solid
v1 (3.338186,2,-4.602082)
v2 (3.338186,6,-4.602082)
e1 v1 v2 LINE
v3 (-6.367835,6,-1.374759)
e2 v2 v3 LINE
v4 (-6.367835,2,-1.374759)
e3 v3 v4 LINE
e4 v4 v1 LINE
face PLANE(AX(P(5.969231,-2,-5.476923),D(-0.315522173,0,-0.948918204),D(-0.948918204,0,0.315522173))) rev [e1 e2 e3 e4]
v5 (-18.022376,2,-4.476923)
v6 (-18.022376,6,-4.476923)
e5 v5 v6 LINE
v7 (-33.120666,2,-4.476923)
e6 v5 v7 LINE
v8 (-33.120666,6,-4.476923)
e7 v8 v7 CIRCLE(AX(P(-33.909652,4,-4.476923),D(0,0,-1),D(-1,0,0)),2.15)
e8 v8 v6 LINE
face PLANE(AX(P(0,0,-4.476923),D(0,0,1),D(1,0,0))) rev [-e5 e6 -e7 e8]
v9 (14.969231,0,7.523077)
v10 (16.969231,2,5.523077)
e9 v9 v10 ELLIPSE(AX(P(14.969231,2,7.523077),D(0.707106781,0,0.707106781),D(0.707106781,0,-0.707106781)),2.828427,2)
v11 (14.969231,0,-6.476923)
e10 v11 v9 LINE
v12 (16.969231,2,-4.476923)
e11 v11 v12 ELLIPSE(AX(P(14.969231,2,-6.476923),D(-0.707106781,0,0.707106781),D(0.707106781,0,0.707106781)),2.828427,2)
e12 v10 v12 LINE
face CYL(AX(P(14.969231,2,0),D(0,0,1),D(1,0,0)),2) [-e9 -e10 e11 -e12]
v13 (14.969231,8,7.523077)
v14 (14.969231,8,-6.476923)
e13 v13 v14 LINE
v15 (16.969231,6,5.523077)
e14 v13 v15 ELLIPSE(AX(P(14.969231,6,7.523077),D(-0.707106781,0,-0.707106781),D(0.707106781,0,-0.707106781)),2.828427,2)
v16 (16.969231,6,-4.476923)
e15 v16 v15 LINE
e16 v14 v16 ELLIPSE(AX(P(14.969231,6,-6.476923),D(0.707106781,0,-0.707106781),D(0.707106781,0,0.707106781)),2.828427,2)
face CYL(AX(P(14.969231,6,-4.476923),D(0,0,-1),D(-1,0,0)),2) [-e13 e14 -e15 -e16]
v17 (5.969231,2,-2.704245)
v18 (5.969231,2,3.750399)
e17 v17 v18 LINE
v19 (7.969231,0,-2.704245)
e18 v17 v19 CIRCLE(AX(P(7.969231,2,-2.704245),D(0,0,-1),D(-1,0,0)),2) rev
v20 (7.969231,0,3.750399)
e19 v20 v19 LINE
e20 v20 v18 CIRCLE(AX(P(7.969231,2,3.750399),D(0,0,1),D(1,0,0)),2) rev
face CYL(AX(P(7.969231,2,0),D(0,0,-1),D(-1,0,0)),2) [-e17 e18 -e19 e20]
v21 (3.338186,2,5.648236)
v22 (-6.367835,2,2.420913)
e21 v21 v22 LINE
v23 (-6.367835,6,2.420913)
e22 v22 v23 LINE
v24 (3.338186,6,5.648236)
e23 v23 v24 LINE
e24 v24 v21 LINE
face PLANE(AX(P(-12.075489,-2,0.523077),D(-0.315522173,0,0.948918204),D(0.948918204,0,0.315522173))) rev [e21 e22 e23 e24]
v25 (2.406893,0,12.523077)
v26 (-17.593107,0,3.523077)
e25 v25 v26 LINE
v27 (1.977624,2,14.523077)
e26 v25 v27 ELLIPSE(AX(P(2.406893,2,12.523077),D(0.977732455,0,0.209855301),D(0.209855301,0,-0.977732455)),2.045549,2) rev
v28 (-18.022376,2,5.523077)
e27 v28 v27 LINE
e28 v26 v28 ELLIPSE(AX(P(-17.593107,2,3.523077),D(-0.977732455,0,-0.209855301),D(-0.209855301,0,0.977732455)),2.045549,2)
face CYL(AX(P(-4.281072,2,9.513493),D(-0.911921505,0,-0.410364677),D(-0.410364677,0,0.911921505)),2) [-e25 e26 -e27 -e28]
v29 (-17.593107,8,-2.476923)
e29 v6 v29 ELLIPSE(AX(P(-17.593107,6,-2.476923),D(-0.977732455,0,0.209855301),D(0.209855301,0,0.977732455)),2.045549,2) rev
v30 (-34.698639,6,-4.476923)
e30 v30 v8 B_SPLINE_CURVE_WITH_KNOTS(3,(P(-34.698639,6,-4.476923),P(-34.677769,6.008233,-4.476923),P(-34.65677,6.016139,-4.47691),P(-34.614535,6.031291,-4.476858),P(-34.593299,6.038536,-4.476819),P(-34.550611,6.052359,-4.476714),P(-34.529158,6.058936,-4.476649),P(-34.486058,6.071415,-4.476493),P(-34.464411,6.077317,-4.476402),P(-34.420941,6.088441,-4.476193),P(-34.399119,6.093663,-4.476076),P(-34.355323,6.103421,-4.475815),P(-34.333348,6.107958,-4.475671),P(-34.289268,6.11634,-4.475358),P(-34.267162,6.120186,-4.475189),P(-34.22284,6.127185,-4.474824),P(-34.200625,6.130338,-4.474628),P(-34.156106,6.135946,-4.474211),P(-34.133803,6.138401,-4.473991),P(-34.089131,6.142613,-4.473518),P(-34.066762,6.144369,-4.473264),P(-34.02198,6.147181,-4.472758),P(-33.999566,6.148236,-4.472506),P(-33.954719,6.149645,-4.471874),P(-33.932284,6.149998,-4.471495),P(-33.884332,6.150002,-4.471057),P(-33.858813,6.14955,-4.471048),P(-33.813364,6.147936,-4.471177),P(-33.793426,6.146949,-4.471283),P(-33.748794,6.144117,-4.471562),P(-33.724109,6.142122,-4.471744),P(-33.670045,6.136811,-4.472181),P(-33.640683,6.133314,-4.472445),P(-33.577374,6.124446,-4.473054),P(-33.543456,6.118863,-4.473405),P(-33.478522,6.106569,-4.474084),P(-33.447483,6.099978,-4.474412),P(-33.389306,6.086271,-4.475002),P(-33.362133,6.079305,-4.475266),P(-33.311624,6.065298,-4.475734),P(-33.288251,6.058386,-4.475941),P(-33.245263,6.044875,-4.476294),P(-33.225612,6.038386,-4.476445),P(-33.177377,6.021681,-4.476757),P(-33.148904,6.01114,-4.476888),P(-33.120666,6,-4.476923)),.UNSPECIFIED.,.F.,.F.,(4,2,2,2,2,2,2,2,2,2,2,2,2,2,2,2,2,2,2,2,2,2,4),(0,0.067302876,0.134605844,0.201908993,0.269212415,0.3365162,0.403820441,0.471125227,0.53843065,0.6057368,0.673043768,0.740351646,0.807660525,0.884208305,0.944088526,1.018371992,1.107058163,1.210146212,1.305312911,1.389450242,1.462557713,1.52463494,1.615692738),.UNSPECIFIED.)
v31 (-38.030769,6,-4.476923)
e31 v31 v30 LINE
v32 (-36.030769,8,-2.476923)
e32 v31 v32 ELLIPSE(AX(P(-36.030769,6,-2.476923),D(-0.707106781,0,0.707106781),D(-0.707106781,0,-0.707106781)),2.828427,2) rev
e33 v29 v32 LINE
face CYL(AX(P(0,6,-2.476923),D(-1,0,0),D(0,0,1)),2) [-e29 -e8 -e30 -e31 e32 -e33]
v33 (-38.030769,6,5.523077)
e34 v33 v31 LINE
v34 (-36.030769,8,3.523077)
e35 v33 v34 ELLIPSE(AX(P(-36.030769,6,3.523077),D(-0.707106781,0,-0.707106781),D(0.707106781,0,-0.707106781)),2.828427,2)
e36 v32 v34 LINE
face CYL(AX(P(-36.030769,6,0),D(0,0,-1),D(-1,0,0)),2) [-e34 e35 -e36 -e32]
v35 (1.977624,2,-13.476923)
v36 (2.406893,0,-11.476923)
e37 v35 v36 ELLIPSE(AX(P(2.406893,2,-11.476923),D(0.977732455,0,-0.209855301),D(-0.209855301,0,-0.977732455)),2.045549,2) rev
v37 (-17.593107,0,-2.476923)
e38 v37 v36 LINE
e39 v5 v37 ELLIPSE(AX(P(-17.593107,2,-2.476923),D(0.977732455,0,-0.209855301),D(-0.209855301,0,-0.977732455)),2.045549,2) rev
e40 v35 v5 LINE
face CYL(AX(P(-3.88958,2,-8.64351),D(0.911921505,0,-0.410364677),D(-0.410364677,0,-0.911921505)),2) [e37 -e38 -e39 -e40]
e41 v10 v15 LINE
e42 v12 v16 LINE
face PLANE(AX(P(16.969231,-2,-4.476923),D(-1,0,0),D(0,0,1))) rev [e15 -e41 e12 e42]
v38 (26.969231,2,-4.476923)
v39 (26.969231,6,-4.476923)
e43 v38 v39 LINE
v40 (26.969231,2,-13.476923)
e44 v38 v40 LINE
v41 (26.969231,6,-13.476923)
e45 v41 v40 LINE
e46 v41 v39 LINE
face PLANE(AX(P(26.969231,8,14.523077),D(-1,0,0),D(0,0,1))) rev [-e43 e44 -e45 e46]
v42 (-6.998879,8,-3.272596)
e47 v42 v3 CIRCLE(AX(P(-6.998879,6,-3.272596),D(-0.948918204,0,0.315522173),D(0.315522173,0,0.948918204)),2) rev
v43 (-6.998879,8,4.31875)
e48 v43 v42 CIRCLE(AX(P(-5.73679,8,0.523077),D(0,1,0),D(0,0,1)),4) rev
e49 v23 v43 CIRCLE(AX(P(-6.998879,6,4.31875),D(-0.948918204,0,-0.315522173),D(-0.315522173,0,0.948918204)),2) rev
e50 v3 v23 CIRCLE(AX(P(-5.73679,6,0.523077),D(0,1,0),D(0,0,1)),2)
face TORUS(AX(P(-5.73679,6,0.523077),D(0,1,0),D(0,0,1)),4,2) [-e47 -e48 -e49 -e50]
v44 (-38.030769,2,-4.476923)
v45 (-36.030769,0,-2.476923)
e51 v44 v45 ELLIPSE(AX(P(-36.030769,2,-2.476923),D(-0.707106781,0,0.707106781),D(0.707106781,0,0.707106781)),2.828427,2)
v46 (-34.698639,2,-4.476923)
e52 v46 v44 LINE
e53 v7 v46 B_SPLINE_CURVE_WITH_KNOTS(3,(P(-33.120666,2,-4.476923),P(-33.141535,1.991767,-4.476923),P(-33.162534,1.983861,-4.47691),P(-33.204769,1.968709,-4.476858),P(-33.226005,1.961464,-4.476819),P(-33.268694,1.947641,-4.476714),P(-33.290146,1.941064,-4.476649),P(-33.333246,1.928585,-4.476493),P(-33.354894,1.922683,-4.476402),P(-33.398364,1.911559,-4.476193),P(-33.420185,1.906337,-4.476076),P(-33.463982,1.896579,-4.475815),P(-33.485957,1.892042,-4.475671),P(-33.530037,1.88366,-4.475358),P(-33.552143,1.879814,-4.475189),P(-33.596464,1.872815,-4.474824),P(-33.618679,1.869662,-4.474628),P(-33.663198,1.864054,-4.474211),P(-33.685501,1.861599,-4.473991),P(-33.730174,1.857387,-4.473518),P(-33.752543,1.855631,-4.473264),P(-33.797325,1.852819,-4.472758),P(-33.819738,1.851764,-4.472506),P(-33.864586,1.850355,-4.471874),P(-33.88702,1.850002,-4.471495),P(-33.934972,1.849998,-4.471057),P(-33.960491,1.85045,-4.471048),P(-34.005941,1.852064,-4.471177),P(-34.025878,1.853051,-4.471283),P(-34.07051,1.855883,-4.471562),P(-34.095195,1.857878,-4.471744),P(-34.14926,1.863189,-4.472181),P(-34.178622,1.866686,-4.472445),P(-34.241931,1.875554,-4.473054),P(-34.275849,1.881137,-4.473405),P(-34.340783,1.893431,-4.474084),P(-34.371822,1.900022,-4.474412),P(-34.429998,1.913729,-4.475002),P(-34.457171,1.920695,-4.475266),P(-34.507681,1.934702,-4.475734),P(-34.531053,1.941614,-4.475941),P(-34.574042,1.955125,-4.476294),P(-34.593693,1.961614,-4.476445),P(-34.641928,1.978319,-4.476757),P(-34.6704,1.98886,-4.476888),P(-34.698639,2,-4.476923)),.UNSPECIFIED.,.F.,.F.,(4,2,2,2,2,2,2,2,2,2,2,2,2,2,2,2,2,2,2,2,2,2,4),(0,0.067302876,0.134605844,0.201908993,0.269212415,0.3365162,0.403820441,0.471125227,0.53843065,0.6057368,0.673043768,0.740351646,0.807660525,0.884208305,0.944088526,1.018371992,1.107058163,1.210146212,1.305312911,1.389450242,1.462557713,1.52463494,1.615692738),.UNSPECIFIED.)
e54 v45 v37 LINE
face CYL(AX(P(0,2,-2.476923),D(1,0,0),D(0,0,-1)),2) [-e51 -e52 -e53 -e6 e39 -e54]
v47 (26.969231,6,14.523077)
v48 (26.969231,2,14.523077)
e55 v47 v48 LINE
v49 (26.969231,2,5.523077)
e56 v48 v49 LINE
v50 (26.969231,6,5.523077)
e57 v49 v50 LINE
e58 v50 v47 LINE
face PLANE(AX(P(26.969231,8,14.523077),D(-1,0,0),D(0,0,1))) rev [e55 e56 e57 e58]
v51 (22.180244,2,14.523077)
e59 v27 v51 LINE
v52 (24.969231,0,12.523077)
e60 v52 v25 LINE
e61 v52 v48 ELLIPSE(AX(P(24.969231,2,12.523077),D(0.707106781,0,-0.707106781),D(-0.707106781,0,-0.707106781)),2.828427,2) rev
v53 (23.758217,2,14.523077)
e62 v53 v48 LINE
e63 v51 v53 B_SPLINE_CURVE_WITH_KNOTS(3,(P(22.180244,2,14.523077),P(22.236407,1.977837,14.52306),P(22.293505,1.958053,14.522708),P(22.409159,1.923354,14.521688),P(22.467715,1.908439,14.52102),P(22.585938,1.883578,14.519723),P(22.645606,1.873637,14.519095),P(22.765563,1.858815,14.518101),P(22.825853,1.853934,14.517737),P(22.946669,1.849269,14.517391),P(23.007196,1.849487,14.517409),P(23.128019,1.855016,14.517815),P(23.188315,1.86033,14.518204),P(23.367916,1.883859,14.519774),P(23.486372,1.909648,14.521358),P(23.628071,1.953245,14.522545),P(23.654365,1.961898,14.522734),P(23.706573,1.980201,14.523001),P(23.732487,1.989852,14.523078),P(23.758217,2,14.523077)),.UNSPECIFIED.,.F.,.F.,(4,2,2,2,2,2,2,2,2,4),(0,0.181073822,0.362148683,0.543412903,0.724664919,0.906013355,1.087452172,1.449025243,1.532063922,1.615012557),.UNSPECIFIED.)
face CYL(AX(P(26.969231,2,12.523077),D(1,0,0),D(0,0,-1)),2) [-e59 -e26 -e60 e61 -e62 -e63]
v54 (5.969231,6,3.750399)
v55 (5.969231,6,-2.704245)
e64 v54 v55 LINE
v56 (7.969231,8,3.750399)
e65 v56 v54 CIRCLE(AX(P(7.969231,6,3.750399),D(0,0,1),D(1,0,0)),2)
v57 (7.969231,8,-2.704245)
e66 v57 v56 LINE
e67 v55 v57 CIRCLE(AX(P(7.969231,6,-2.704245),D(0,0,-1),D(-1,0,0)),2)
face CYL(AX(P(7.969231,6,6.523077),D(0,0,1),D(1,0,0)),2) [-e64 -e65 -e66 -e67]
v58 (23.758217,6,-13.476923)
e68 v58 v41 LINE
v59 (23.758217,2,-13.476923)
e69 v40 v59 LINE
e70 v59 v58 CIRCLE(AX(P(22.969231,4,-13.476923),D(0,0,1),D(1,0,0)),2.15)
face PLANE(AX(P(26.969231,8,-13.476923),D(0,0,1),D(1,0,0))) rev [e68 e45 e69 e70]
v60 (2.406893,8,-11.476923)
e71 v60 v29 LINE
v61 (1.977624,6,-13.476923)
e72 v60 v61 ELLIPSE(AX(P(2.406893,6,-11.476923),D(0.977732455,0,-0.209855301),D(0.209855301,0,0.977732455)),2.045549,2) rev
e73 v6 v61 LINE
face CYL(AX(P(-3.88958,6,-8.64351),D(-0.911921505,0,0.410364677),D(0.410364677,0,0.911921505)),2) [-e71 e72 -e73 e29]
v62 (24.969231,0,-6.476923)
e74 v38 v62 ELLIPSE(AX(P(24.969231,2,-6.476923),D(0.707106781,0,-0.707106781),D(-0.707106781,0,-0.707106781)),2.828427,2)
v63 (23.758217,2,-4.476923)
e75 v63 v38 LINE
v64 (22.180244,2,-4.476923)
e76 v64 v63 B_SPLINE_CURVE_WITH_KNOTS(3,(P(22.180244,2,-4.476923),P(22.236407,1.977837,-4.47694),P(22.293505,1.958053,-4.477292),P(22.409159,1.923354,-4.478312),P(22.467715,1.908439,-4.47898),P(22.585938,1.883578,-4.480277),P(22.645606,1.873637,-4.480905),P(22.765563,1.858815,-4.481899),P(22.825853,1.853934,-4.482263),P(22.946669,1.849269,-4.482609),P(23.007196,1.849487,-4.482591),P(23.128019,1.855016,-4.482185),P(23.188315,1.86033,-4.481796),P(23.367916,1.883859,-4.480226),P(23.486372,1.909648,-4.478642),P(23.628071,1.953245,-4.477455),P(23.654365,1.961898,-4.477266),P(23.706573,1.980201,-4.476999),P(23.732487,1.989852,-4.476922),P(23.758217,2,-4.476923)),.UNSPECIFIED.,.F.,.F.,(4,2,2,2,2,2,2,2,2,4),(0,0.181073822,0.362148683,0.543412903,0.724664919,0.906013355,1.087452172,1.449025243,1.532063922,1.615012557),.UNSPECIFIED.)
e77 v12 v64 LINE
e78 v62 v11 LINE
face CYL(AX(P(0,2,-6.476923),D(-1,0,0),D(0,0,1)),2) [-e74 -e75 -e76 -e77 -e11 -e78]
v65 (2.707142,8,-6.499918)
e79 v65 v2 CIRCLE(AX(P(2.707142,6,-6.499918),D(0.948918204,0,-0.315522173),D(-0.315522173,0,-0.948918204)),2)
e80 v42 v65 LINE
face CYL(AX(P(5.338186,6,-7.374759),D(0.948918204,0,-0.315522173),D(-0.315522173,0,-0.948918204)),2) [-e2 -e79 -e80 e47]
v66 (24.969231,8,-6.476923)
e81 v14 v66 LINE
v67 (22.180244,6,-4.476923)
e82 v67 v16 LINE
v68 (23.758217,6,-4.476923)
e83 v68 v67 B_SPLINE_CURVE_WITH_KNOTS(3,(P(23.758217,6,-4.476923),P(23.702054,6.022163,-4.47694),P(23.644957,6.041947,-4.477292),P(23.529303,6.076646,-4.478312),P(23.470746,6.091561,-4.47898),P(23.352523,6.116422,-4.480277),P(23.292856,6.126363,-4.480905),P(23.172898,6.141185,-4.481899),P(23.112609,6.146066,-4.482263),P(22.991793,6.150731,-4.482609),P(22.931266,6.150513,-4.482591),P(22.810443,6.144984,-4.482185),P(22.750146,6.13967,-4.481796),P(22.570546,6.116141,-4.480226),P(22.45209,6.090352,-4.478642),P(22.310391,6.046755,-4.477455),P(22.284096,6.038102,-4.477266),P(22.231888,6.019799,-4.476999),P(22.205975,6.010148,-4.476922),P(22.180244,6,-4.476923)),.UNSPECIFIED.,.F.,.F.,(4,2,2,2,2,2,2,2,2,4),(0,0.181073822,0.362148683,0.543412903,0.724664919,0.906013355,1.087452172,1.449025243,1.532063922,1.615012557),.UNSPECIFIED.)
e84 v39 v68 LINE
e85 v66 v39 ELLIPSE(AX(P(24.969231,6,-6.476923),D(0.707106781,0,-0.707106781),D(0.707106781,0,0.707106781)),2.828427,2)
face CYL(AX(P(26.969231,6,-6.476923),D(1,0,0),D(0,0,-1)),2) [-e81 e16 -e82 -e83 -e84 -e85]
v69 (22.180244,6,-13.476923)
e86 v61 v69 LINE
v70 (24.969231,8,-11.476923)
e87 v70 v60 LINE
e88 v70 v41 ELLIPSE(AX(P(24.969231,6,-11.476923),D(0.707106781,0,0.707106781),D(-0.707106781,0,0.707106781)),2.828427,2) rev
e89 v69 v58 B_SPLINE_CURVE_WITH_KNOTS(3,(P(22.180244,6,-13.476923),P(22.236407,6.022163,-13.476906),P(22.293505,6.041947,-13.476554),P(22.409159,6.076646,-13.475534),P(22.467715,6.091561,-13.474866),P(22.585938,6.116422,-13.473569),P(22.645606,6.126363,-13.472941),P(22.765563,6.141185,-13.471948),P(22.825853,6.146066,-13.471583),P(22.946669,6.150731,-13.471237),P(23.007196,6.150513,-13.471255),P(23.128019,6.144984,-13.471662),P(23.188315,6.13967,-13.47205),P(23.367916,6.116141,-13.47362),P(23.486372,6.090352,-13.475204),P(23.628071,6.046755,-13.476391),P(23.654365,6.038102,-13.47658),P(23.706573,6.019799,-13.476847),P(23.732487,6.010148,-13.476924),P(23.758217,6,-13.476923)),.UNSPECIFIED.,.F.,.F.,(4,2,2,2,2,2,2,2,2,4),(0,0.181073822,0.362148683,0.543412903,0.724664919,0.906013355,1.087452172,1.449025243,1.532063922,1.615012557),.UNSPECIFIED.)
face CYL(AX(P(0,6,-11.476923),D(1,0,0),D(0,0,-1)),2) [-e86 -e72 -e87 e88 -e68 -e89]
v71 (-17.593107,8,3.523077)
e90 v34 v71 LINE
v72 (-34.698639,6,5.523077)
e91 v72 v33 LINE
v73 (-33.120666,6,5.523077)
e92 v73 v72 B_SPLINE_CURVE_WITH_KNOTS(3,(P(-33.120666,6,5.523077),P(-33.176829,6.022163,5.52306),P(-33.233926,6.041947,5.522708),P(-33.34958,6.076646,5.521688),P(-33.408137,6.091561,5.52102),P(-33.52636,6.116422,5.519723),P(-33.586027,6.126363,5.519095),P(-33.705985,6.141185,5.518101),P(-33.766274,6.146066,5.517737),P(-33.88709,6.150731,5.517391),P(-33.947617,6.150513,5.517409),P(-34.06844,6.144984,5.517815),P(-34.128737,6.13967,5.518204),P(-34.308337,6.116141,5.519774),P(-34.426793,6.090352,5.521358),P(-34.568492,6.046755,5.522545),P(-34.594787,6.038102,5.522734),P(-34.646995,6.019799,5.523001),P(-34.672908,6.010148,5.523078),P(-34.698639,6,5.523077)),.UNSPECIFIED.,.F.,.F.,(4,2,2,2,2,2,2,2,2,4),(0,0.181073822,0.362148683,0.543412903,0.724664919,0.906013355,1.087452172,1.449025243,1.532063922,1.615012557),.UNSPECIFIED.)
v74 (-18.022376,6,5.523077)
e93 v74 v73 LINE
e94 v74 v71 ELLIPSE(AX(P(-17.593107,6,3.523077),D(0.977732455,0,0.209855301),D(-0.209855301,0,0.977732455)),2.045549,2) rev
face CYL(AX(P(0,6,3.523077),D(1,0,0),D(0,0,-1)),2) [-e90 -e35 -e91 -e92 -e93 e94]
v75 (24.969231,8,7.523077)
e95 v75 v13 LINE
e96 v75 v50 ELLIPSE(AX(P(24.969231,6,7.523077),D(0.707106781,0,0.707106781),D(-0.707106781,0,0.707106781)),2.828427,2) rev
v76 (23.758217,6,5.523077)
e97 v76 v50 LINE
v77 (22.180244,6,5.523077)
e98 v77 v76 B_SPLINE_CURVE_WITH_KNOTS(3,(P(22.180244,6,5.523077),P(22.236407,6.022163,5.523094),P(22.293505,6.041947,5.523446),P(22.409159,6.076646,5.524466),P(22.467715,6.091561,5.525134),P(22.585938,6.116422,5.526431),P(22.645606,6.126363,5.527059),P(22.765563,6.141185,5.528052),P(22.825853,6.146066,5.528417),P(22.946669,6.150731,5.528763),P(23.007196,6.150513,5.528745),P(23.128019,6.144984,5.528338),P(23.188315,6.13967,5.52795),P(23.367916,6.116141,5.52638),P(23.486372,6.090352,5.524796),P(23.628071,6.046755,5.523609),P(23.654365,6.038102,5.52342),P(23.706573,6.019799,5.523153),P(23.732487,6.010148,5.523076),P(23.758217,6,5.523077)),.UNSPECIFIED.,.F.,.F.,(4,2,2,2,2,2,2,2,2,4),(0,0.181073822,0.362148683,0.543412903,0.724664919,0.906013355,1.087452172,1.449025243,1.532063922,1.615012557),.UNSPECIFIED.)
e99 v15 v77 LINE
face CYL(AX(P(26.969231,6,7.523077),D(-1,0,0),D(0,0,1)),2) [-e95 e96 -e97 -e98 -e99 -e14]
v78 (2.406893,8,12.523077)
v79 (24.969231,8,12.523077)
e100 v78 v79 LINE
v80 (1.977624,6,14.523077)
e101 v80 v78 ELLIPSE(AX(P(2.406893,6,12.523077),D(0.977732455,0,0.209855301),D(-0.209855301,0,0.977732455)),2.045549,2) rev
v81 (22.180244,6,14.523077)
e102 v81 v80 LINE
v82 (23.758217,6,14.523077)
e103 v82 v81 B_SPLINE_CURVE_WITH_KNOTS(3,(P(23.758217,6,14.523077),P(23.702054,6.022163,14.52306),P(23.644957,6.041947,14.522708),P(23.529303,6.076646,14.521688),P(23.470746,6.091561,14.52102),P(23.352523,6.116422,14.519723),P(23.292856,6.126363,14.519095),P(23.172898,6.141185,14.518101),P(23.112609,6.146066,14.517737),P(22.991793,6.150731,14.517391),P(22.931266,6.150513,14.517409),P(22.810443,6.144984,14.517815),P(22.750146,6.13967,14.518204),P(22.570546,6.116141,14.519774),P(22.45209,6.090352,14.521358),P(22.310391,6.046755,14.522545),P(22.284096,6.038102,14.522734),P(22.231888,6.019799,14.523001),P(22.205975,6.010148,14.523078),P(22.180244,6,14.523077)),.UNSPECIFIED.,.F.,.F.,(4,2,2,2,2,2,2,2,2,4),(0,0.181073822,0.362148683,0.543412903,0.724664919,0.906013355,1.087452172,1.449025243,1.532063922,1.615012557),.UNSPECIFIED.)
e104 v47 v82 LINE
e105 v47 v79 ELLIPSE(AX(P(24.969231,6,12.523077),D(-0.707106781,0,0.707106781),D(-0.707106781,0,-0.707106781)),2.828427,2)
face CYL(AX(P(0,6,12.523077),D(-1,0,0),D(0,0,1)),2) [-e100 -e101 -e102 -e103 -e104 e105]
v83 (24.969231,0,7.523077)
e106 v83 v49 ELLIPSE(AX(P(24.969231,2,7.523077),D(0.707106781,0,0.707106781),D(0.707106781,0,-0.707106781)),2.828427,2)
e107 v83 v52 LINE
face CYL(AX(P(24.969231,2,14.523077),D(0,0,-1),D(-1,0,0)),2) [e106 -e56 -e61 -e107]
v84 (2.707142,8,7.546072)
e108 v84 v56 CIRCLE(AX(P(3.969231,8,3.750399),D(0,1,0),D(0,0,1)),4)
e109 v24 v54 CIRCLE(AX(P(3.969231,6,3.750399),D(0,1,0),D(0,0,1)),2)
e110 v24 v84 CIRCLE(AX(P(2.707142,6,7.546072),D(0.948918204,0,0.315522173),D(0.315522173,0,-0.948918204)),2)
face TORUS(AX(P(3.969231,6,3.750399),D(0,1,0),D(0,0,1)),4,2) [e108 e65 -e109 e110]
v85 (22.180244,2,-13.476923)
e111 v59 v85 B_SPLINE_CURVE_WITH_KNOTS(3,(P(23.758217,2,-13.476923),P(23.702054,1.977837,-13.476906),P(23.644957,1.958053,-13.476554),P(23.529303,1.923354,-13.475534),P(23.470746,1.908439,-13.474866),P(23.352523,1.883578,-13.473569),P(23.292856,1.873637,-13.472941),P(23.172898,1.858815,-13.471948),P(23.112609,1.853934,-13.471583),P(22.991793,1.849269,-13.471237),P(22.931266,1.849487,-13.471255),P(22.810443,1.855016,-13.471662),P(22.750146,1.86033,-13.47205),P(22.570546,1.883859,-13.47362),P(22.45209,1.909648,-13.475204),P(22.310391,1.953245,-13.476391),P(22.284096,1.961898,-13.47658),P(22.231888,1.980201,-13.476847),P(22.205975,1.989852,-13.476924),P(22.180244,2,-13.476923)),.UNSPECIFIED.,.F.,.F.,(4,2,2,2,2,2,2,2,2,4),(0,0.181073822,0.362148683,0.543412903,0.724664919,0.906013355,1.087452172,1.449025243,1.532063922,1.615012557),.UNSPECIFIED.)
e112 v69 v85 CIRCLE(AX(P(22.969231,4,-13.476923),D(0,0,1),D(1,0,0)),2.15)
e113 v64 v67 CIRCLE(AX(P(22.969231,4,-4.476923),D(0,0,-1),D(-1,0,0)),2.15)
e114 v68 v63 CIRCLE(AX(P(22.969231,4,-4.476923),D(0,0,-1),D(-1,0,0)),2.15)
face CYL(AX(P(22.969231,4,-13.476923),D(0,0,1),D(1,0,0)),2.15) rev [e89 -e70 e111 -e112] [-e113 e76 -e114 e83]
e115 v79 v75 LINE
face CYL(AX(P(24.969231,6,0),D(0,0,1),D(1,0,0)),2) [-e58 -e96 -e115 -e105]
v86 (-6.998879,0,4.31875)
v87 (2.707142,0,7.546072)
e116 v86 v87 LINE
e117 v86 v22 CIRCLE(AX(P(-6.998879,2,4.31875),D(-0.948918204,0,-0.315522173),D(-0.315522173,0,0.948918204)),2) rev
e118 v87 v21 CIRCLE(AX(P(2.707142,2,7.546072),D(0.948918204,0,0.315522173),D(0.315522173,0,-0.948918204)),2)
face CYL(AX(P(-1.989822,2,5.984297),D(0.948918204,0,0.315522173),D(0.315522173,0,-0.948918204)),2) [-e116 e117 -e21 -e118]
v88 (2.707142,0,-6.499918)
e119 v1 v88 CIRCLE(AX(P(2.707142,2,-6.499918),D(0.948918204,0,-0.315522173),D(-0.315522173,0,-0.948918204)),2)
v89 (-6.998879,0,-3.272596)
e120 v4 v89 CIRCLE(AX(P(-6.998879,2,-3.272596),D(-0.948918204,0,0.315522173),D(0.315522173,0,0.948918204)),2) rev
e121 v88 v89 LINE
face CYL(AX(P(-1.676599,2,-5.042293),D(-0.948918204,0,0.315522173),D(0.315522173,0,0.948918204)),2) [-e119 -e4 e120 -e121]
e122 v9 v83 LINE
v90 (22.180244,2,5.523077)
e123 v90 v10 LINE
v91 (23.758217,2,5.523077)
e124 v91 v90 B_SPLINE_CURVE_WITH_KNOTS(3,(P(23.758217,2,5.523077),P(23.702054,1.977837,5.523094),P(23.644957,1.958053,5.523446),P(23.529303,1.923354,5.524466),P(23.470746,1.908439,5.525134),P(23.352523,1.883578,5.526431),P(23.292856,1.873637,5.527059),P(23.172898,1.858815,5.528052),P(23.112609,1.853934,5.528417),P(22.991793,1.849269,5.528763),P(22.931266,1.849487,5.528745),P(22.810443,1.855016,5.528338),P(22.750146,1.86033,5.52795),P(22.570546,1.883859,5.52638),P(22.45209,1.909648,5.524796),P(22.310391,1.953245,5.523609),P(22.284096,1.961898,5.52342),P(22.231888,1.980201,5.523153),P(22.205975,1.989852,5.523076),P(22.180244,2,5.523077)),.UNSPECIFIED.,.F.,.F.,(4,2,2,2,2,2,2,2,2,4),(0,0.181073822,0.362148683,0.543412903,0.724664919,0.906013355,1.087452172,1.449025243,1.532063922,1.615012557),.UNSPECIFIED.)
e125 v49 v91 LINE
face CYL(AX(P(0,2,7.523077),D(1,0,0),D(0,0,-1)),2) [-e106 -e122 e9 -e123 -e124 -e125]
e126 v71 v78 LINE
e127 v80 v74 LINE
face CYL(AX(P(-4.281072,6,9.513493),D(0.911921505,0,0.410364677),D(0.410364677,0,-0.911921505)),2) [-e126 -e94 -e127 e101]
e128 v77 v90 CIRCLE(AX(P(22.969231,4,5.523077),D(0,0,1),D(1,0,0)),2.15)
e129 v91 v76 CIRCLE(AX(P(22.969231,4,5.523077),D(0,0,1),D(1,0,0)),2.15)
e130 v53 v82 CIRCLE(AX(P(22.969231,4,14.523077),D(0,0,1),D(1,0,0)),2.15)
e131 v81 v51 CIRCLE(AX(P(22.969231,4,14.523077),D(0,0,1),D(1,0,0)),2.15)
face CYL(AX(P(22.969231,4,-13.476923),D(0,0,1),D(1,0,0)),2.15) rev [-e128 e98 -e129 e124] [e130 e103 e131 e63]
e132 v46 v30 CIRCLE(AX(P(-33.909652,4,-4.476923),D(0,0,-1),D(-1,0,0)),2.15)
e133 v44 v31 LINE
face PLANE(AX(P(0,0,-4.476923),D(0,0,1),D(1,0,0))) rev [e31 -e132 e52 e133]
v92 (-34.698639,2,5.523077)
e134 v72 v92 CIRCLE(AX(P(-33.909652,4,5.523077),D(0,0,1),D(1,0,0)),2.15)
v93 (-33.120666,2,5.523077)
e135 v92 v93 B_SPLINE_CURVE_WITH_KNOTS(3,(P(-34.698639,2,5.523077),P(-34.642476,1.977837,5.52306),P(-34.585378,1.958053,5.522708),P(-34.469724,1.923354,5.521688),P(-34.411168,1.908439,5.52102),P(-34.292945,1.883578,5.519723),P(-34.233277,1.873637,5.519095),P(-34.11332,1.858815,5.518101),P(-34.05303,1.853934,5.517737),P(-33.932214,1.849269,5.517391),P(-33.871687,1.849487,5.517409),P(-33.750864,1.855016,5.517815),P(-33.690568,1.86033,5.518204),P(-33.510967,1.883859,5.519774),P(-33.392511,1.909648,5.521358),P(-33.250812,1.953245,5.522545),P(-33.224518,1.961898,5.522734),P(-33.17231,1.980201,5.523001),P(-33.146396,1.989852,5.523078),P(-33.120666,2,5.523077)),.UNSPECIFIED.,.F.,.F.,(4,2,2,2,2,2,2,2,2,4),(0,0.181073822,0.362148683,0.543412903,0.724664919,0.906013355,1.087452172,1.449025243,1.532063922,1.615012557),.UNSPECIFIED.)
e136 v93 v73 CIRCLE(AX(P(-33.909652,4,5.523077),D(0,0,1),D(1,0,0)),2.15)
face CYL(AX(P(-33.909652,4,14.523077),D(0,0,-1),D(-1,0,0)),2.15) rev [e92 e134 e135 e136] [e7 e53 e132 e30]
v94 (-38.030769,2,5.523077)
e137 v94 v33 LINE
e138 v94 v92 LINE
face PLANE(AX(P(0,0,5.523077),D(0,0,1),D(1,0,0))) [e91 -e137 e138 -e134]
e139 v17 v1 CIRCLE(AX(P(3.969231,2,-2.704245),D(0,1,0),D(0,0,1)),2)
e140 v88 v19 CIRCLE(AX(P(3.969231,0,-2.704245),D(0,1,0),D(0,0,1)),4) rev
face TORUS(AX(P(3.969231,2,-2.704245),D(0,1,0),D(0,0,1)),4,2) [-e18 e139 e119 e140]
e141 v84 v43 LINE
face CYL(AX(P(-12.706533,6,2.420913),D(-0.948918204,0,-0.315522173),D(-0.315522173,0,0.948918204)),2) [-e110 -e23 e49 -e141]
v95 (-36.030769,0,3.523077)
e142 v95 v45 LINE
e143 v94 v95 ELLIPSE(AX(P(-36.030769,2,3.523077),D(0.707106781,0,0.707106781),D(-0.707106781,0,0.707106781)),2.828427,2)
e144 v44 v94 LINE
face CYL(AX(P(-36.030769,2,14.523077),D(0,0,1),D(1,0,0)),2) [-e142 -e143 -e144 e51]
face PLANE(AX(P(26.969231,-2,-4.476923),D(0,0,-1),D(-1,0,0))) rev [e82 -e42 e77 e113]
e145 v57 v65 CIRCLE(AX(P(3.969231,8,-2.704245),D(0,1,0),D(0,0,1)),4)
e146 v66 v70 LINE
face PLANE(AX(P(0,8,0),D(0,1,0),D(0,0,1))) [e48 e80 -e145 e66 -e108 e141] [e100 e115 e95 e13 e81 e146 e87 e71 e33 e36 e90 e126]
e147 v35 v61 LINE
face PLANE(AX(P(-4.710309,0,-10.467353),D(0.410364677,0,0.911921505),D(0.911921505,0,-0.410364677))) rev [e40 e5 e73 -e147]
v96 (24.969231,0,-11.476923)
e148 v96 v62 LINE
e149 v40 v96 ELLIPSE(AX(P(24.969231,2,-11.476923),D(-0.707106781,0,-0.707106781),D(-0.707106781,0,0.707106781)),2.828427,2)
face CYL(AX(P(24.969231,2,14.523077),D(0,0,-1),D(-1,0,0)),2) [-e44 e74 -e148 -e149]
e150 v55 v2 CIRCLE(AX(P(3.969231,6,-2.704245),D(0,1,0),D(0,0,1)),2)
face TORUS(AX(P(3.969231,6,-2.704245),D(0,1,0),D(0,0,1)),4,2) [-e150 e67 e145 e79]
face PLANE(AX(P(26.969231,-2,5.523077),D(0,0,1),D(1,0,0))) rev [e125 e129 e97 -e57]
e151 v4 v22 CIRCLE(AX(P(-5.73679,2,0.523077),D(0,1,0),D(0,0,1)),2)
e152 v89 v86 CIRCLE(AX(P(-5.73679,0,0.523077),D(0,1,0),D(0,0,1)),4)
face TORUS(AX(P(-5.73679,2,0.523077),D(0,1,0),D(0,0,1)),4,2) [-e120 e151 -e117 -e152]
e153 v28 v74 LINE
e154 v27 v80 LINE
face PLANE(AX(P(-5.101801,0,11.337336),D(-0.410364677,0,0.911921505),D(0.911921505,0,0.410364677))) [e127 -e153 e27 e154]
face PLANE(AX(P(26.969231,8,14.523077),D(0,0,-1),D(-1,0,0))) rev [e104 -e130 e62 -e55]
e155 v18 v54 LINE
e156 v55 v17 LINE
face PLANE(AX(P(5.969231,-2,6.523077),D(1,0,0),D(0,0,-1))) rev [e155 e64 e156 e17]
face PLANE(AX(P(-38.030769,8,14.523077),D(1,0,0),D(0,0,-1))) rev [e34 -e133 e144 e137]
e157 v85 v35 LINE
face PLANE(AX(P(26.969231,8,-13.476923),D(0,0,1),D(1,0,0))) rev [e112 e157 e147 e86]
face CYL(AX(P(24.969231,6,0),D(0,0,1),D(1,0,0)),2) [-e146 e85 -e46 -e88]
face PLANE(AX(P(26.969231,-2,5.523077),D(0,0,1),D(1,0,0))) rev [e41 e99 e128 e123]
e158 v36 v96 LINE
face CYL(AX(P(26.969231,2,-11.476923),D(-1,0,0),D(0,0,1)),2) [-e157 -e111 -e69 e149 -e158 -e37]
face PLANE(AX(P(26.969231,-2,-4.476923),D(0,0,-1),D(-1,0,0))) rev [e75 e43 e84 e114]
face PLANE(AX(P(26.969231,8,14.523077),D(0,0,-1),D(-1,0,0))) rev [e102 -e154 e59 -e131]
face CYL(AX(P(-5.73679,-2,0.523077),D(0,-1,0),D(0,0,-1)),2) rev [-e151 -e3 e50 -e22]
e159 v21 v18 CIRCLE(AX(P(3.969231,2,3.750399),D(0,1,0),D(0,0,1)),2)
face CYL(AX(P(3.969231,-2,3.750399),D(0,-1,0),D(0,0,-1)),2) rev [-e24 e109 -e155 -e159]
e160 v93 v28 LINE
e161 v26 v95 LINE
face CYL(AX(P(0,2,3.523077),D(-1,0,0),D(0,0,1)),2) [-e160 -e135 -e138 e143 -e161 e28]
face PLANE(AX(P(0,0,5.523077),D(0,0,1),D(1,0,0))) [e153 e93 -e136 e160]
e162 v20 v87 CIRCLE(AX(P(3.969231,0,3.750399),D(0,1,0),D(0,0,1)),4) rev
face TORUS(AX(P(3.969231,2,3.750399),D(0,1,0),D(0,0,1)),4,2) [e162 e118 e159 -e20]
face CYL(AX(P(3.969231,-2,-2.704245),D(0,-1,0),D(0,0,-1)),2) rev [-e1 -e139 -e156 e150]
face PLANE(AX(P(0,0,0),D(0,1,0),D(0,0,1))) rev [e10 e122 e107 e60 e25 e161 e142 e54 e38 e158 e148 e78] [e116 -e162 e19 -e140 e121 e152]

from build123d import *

# Parameters (mm, degrees)
SKETCH1_W           = 65
SKETCH1_H           = 28
BOSS_EXTRUDE1_DEPTH = 8
SKETCH2_W           = 10
SKETCH2_H           = 10
CUT_EXTRUDE1_DEPTH  = 10
SKETCH3_R           = 2.15
CUT_EXTRUDE2_DEPTH  = 48.899263129
SKETCH5_W           = 20.008392886
SKETCH5_H           = 9
CUT_EXTRUDE4_DEPTH  = 42.488060591
FILLET1_R           = 2
SKETCH8_R           = 2.15
CUT_EXTRUDE5_DEPTH  = 44.258980729
CUT_EXTRUDE6_DEPTH  = 10
FILLET2_R           = 2


with BuildPart() as part:
    # Sketch1 → Boss-Extrude1 (new body)
    with BuildSketch(Plane(origin=(0, 0, 0), x_dir=(1, 0, 0), z_dir=(0, 1, 0))):
        with Locations((-5.530769231, -0.523076923)):
            Rectangle(SKETCH1_W, SKETCH1_H)
    extrude(amount=BOSS_EXTRUDE1_DEPTH)

    # Sketch2 → Cut-Extrude1 (cut)
    with BuildSketch(Plane(origin=(0, 8, 0), x_dir=(1, 0, 0), z_dir=(0, 1, 0))):
        with Locations((21.969230769, -0.523076923)):
            Rectangle(SKETCH2_W, SKETCH2_H)
    extrude(amount=-CUT_EXTRUDE1_DEPTH, mode=Mode.SUBTRACT)

    # Sketch3 → Cut-Extrude2 (cut, through all)
    with BuildSketch(Plane.XY.offset(14.523076923)):
        with Locations((22.969230769, 4)):
            Circle(SKETCH3_R)
    extrude(amount=-CUT_EXTRUDE2_DEPTH, mode=Mode.SUBTRACT)

    # Sketch5 → Cut-Extrude4 (cut, through all)
    with BuildSketch(Plane(origin=(0, 8, 0), x_dir=(1, 0, 0), z_dir=(0, 1, 0))):
        with Locations((-28.026572788, 8.976923077)):
            Rectangle(SKETCH5_W, SKETCH5_H)
        Polygon((-18.022376345, 13.476923077), (-18.022376345, 4.476923077), (1.977623655, 13.476923077), align=None)
        Polygon((1.977623655, -14.523076923), (-18.022376345, -5.523076923), (-18.022376345, -14.523076923), align=None)
        with Locations((-28.026572788, -10.023076923)):
            Rectangle(SKETCH5_W, SKETCH5_H)
    extrude(amount=-CUT_EXTRUDE4_DEPTH, mode=Mode.SUBTRACT)

    # Fillet1
    # the kernel refuses this fillet: 2 mm, written as the material it takes off along each edge
    with BuildSketch(Plane(origin=(26.969230769, 0, -18.476923077), x_dir=(-1, 0, 0), z_dir=(0, 0, 1)), Plane(origin=(26.969230769, 0, 0.523076923), x_dir=(-1, 0, 0), z_dir=(0, 0, 1))) as fillet1_piece_1:
        with BuildLine():
            CenterArc((FILLET1_R, -FILLET1_R), FILLET1_R, 90, 90)
            Line((0, -FILLET1_R), (0, 0))
            Line((0, 0), (FILLET1_R, 0))
        make_face()
    extrude(amount=19, mode=Mode.SUBTRACT)
    with BuildSketch(Plane(origin=(16.969230769, 0, -4.476923077), x_dir=(0, 0, -1), z_dir=(1, 0, 0)), Plane(origin=(31.969230769, 0, 5.523076923), x_dir=(0, 0, 1), z_dir=(-1, 0, 0)), Plane(origin=(31.969230769, 8, -4.476923077), x_dir=(0, 0, -1), z_dir=(-1, 0, 0)), Plane(origin=(16.969230769, 8, 5.523076923), x_dir=(0, 0, 1), z_dir=(1, 0, 0))) as fillet1_piece_2:
        with BuildLine():
            CenterArc((FILLET1_R, FILLET1_R), FILLET1_R, 180, 90)
            Line((0, FILLET1_R), (0, 0))
            Line((0, 0), (FILLET1_R, 0))
        make_face()
    extrude(amount=15, mode=Mode.SUBTRACT)
    with BuildSketch(Plane(origin=(16.969230769, 0, 5.523076923), x_dir=(-1, 0, 0), z_dir=(0, 0, -1)), Plane(origin=(16.969230769, 8, -4.476923077), x_dir=(-1, 0, 0), z_dir=(0, 0, 1))) as fillet1_piece_3:
        with BuildLine():
            CenterArc((FILLET1_R, FILLET1_R), FILLET1_R, 180, 90)
            Line((0, FILLET1_R), (0, 0))
            Line((0, 0), (FILLET1_R, 0))
        make_face()
    extrude(amount=10, mode=Mode.SUBTRACT)
    with BuildSketch(Plane(origin=(26.969230769, 8, -18.476923077), x_dir=(-1, 0, 0), z_dir=(0, 0, 1)), Plane(origin=(26.969230769, 8, 0.523076923), x_dir=(-1, 0, 0), z_dir=(0, 0, 1))) as fillet1_piece_4:
        with BuildLine():
            CenterArc((FILLET1_R, FILLET1_R), FILLET1_R, 180, 90)
            Line((0, FILLET1_R), (0, 0))
            Line((0, 0), (FILLET1_R, 0))
        make_face()
    extrude(amount=19, mode=Mode.SUBTRACT)
    with BuildSketch(Plane(origin=(31.969230769, 0, 14.523076923), x_dir=(0, 1, 0), z_dir=(-1, 0, 0)), Plane(origin=(-3.022376345, 8, -13.476923077), x_dir=(0, 0, 1), z_dir=(1, 0, 0))) as fillet1_piece_5:
        with BuildLine():
            CenterArc((FILLET1_R, FILLET1_R), FILLET1_R, 180, 90)
            Line((0, FILLET1_R), (0, 0))
            Line((0, 0), (FILLET1_R, 0))
        make_face()
    extrude(amount=34.991607114, mode=Mode.SUBTRACT)
    with BuildSketch(Plane(origin=(-38.030769231, 0, 10.523076923), x_dir=(1, 0, 0), z_dir=(0, 0, -1))) as fillet1_piece_6:
        with BuildLine():
            CenterArc((FILLET1_R, -FILLET1_R), FILLET1_R, 90, 90)
            Line((0, -FILLET1_R), (0, 0))
            Line((0, 0), (FILLET1_R, 0))
        make_face()
    extrude(amount=20, mode=Mode.SUBTRACT)
    with BuildSketch(Plane(origin=(-38.030769231, 8, 10.523076923), x_dir=(1, 0, 0), z_dir=(0, 0, -1))) as fillet1_piece_7:
        with BuildLine():
            CenterArc((FILLET1_R, FILLET1_R), FILLET1_R, 180, 90)
            Line((0, FILLET1_R), (0, 0))
            Line((0, 0), (FILLET1_R, 0))
        make_face()
    extrude(amount=20, mode=Mode.SUBTRACT)
    with BuildSketch(Plane(origin=(31.969230769, 8, 14.523076923), x_dir=(0, -1, 0), z_dir=(-1, 0, 0)), Plane(origin=(-3.022376345, 0, -13.476923077), x_dir=(0, 0, 1), z_dir=(1, 0, 0))) as fillet1_piece_8:
        with BuildLine():
            CenterArc((FILLET1_R, -FILLET1_R), FILLET1_R, 90, 90)
            Line((0, -FILLET1_R), (0, 0))
            Line((0, 0), (FILLET1_R, 0))
        make_face()
    extrude(amount=34.991607114, mode=Mode.SUBTRACT)
    with BuildSketch(Plane(origin=(-13.022376345, 0, -4.476923077), x_dir=(0, 0, 1), z_dir=(-1, 0, 0))) as fillet1_piece_9_section:
        with BuildLine():
            CenterArc((FILLET1_R, FILLET1_R), FILLET1_R, 180, 90)
            Line((0, FILLET1_R), (0, 0))
            Line((0, 0), (FILLET1_R, 0))
        make_face()
    fillet1_piece_9 = extrude(amount=30.008392886, mode=Mode.PRIVATE)
    fillet1_piece_9 = split(fillet1_piece_9, bisect_by=Plane(origin=(-28.986353443, 0.462958452, 0.456866617), z_dir=(-0.4103646773287979, 0, -0.9119215051751064)), keep=Keep.TOP, mode=Mode.PRIVATE)
    add(fillet1_piece_9, mode=Mode.SUBTRACT)
    with BuildSketch(Plane(origin=(6.537231181, 0, -15.528746464), x_dir=(0.41036467732879783, 0, 0.9119215051751064), z_dir=(-0.9119215051751064, 0, 0.4103646773287979))) as fillet1_piece_10_section:
        with BuildLine():
            CenterArc((FILLET1_R, FILLET1_R), FILLET1_R, 180, 90)
            Line((0, FILLET1_R), (0, 0))
            Line((0, 0), (FILLET1_R, 0))
        make_face()
    fillet1_piece_10 = extrude(amount=31.931712199, mode=Mode.PRIVATE)
    fillet1_piece_10 = split(fillet1_piece_10, bisect_by=Plane(origin=(-5.120660907, 0.462204108, -4.476923077), z_dir=(0, 0, -1)), keep=Keep.TOP, mode=Mode.PRIVATE)
    add(fillet1_piece_10, mode=Mode.SUBTRACT)
    with BuildSketch(Plane(origin=(-43.030769231, 8, -4.476923077), x_dir=(0, 0, 1), z_dir=(1, 0, 0))) as fillet1_piece_11_section:
        with BuildLine():
            CenterArc((FILLET1_R, FILLET1_R), FILLET1_R, 180, 90)
            Line((0, FILLET1_R), (0, 0))
            Line((0, 0), (FILLET1_R, 0))
        make_face()
    fillet1_piece_11 = extrude(amount=30.008392886, mode=Mode.PRIVATE)
    fillet1_piece_11 = split(fillet1_piece_11, bisect_by=Plane(origin=(-28.986353443, 7.537041548, 0.456866617), z_dir=(-0.4103646773287979, 0, -0.9119215051751064)), keep=Keep.TOP, mode=Mode.PRIVATE)
    add(fillet1_piece_11, mode=Mode.SUBTRACT)
    with BuildSketch(Plane(origin=(-22.581983871, 8, -2.42509969), x_dir=(0.4103646773287979, 0, 0.9119215051751064), z_dir=(0.9119215051751064, 0, -0.4103646773287979))) as fillet1_piece_12_section:
        with BuildLine():
            CenterArc((FILLET1_R, FILLET1_R), FILLET1_R, 180, 90)
            Line((0, FILLET1_R), (0, 0))
            Line((0, 0), (FILLET1_R, 0))
        make_face()
    fillet1_piece_12 = extrude(amount=31.931712199, mode=Mode.PRIVATE)
    fillet1_piece_12 = split(fillet1_piece_12, bisect_by=Plane(origin=(-5.120660907, 7.537795892, -4.476923077), z_dir=(0, 0, -1)), keep=Keep.TOP, mode=Mode.PRIVATE)
    add(fillet1_piece_12, mode=Mode.SUBTRACT)
    with BuildSketch(Plane(origin=(6.537231181, 8, 16.57490031), x_dir=(0, -1, 0), z_dir=(-0.9119215051751064, 0, -0.41036467732879806))) as fillet1_piece_13_section:
        with BuildLine():
            CenterArc((FILLET1_R, -FILLET1_R), FILLET1_R, 90, 90)
            Line((0, -FILLET1_R), (0, 0))
            Line((0, 0), (FILLET1_R, 0))
        make_face()
    fillet1_piece_13 = extrude(amount=31.931712199, mode=Mode.PRIVATE)
    fillet1_piece_13 = split(fillet1_piece_13, bisect_by=Plane(origin=(-5.120660907, 7.537795892, 5.523076923), z_dir=(0, 0, 1)), keep=Keep.TOP, mode=Mode.PRIVATE)
    add(fillet1_piece_13, mode=Mode.SUBTRACT)
    with BuildSketch(Plane(origin=(-13.022376345, 8, 5.523076923), x_dir=(0, 0, -1), z_dir=(-1, 0, 0))) as fillet1_piece_14_section:
        with BuildLine():
            CenterArc((FILLET1_R, FILLET1_R), FILLET1_R, 180, 90)
            Line((0, FILLET1_R), (0, 0))
            Line((0, 0), (FILLET1_R, 0))
        make_face()
    fillet1_piece_14 = extrude(amount=30.008392886, mode=Mode.PRIVATE)
    fillet1_piece_14 = split(fillet1_piece_14, bisect_by=Plane(origin=(-28.986353443, 7.537041548, 0.589287229), z_dir=(-0.41036467732879806, 0, 0.9119215051751064)), keep=Keep.TOP, mode=Mode.PRIVATE)
    add(fillet1_piece_14, mode=Mode.SUBTRACT)
    with BuildSketch(Plane(origin=(-22.581983871, 0, 3.471253536), x_dir=(0.41036467732879806, 0, -0.9119215051751064), z_dir=(0.9119215051751064, 0, 0.41036467732879806))) as fillet1_piece_15_section:
        with BuildLine():
            CenterArc((FILLET1_R, FILLET1_R), FILLET1_R, 180, 90)
            Line((0, FILLET1_R), (0, 0))
            Line((0, 0), (FILLET1_R, 0))
        make_face()
    fillet1_piece_15 = extrude(amount=31.931712199, mode=Mode.PRIVATE)
    fillet1_piece_15 = split(fillet1_piece_15, bisect_by=Plane(origin=(-5.120660907, 0.462204108, 5.523076923), z_dir=(0, 0, 1)), keep=Keep.TOP, mode=Mode.PRIVATE)
    add(fillet1_piece_15, mode=Mode.SUBTRACT)
    with BuildSketch(Plane(origin=(-43.030769231, 0, 5.523076923), x_dir=(0, 0, -1), z_dir=(1, 0, 0))) as fillet1_piece_16_section:
        with BuildLine():
            CenterArc((FILLET1_R, FILLET1_R), FILLET1_R, 180, 90)
            Line((0, FILLET1_R), (0, 0))
            Line((0, 0), (FILLET1_R, 0))
        make_face()
    fillet1_piece_16 = extrude(amount=30.008392886, mode=Mode.PRIVATE)
    fillet1_piece_16 = split(fillet1_piece_16, bisect_by=Plane(origin=(-28.986353443, 0.462958452, 0.589287229), z_dir=(-0.41036467732879806, 0, 0.9119215051751064)), keep=Keep.TOP, mode=Mode.PRIVATE)
    add(fillet1_piece_16, mode=Mode.SUBTRACT)
    with BuildSketch(Plane(origin=(16.969230769, 0, 5.523076923), x_dir=(-1, 0, 0), z_dir=(0, 0, -1))) as fillet1_piece_17a_section:
        with BuildLine():
            CenterArc((FILLET1_R, FILLET1_R), FILLET1_R, 180, 90)
            Line((0, FILLET1_R), (0, 0))
            Line((0, 0), (FILLET1_R, 0))
        make_face()
    fillet1_piece_17a = extrude(amount=15, mode=Mode.PRIVATE)
    fillet1_piece_17a = split(fillet1_piece_17a, bisect_by=Plane(origin=(16.516440541, 0.452790229, -4.476923077), z_dir=(0, 0, -1)), keep=Keep.TOP, mode=Mode.PRIVATE)
    with BuildSketch(Plane(origin=(11.969230769, 0, -4.476923077), x_dir=(0, 0, -1), z_dir=(1, 0, 0))) as fillet1_piece_17b_section:
        with BuildLine():
            CenterArc((FILLET1_R, FILLET1_R), FILLET1_R, 180, 90)
            Line((0, FILLET1_R), (0, 0))
            Line((0, 0), (FILLET1_R, 0))
        make_face()
    fillet1_piece_17b = extrude(amount=20, mode=Mode.PRIVATE)
    fillet1_piece_17b = split(fillet1_piece_17b, bisect_by=Plane(origin=(16.969230769, 0.452790229, -4.929713305), z_dir=(-1, 0, 0)), keep=Keep.TOP, mode=Mode.PRIVATE)
    fillet1_piece_17 = fillet1_piece_17a & fillet1_piece_17b
    add(fillet1_piece_17, mode=Mode.SUBTRACT)
    with BuildSketch(Plane(origin=(31.969230769, 0, 5.523076923), x_dir=(0, 0, 1), z_dir=(-1, 0, 0))) as fillet1_piece_18a_section:
        with BuildLine():
            CenterArc((FILLET1_R, FILLET1_R), FILLET1_R, 180, 90)
            Line((0, FILLET1_R), (0, 0))
            Line((0, 0), (FILLET1_R, 0))
        make_face()
    fillet1_piece_18a = extrude(amount=20, mode=Mode.PRIVATE)
    fillet1_piece_18a = split(fillet1_piece_18a, bisect_by=Plane(origin=(16.969230769, 0.452790229, 5.975867152), z_dir=(-1, 0, 0)), keep=Keep.TOP, mode=Mode.PRIVATE)
    with BuildSketch(Plane(origin=(16.969230769, 0, 10.523076923), x_dir=(-1, 0, 0), z_dir=(0, 0, -1))) as fillet1_piece_18b_section:
        with BuildLine():
            CenterArc((FILLET1_R, FILLET1_R), FILLET1_R, 180, 90)
            Line((0, FILLET1_R), (0, 0))
            Line((0, 0), (FILLET1_R, 0))
        make_face()
    fillet1_piece_18b = extrude(amount=15, mode=Mode.PRIVATE)
    fillet1_piece_18b = split(fillet1_piece_18b, bisect_by=Plane(origin=(16.516440541, 0.452790229, 5.523076923), z_dir=(0, 0, 1)), keep=Keep.TOP, mode=Mode.PRIVATE)
    fillet1_piece_18 = fillet1_piece_18a & fillet1_piece_18b
    add(fillet1_piece_18, mode=Mode.SUBTRACT)
    with BuildSketch(Plane(origin=(16.969230769, 8, -9.476923077), x_dir=(-1, 0, 0), z_dir=(0, 0, 1))) as fillet1_piece_19a_section:
        with BuildLine():
            CenterArc((FILLET1_R, FILLET1_R), FILLET1_R, 180, 90)
            Line((0, FILLET1_R), (0, 0))
            Line((0, 0), (FILLET1_R, 0))
        make_face()
    fillet1_piece_19a = extrude(amount=15, mode=Mode.PRIVATE)
    fillet1_piece_19a = split(fillet1_piece_19a, bisect_by=Plane(origin=(16.516440541, 7.547209771, -4.476923077), z_dir=(0, 0, -1)), keep=Keep.TOP, mode=Mode.PRIVATE)
    with BuildSketch(Plane(origin=(31.969230769, 8, -4.476923077), x_dir=(0, 0, -1), z_dir=(-1, 0, 0))) as fillet1_piece_19b_section:
        with BuildLine():
            CenterArc((FILLET1_R, FILLET1_R), FILLET1_R, 180, 90)
            Line((0, FILLET1_R), (0, 0))
            Line((0, 0), (FILLET1_R, 0))
        make_face()
    fillet1_piece_19b = extrude(amount=20, mode=Mode.PRIVATE)
    fillet1_piece_19b = split(fillet1_piece_19b, bisect_by=Plane(origin=(16.969230769, 7.547209771, -4.929713305), z_dir=(-1, 0, 0)), keep=Keep.TOP, mode=Mode.PRIVATE)
    fillet1_piece_19 = fillet1_piece_19a & fillet1_piece_19b
    add(fillet1_piece_19, mode=Mode.SUBTRACT)
    with BuildSketch(Plane(origin=(11.969230769, 8, 5.523076923), x_dir=(0, 0, 1), z_dir=(1, 0, 0))) as fillet1_piece_20a_section:
        with BuildLine():
            CenterArc((FILLET1_R, FILLET1_R), FILLET1_R, 180, 90)
            Line((0, FILLET1_R), (0, 0))
            Line((0, 0), (FILLET1_R, 0))
        make_face()
    fillet1_piece_20a = extrude(amount=20, mode=Mode.PRIVATE)
    fillet1_piece_20a = split(fillet1_piece_20a, bisect_by=Plane(origin=(16.969230769, 7.547209771, 5.975867152), z_dir=(-1, 0, 0)), keep=Keep.TOP, mode=Mode.PRIVATE)
    with BuildSketch(Plane(origin=(16.969230769, 8, -4.476923077), x_dir=(-1, 0, 0), z_dir=(0, 0, 1))) as fillet1_piece_20b_section:
        with BuildLine():
            CenterArc((FILLET1_R, FILLET1_R), FILLET1_R, 180, 90)
            Line((0, FILLET1_R), (0, 0))
            Line((0, 0), (FILLET1_R, 0))
        make_face()
    fillet1_piece_20b = extrude(amount=15, mode=Mode.PRIVATE)
    fillet1_piece_20b = split(fillet1_piece_20b, bisect_by=Plane(origin=(16.516440541, 7.547209771, 5.523076923), z_dir=(0, 0, 1)), keep=Keep.TOP, mode=Mode.PRIVATE)
    fillet1_piece_20 = fillet1_piece_20a & fillet1_piece_20b
    add(fillet1_piece_20, mode=Mode.SUBTRACT)
    with BuildSketch(Plane(origin=(6.537231181, 0, -15.528746464), x_dir=(0.41036467732879783, 0, 0.9119215051751064), z_dir=(-0.9119215051751064, 0, 0.4103646773287979))) as fillet1_piece_21a_section:
        with BuildLine():
            CenterArc((FILLET1_R, FILLET1_R), FILLET1_R, 180, 90)
            Line((0, FILLET1_R), (0, 0))
            Line((0, 0), (FILLET1_R, 0))
        make_face()
    fillet1_piece_21a = extrude(amount=31.931712199, mode=Mode.PRIVATE)
    fillet1_piece_21a = split(fillet1_piece_21a, bisect_by=Plane(origin=(-19.559662553, 0.412155613, -4.476923077), z_dir=(0, 0, 1)), keep=Keep.TOP, mode=Mode.PRIVATE)
    with BuildSketch(Plane(origin=(-13.022376345, 0, -4.476923077), x_dir=(0, 0, 1), z_dir=(-1, 0, 0))) as fillet1_piece_21b_section:
        with BuildLine():
            CenterArc((FILLET1_R, FILLET1_R), FILLET1_R, 180, 90)
            Line((0, FILLET1_R), (0, 0))
            Line((0, 0), (FILLET1_R, 0))
        make_face()
    fillet1_piece_21b = extrude(amount=30.008392886, mode=Mode.PRIVATE)
    fillet1_piece_21b = split(fillet1_piece_21b, bisect_by=Plane(origin=(-16.620491992, 0.412155613, -5.107771036), z_dir=(0.4103646773287979, 0, 0.9119215051751064)), keep=Keep.TOP, mode=Mode.PRIVATE)
    fillet1_piece_21 = fillet1_piece_21a & fillet1_piece_21b
    add(fillet1_piece_21, mode=Mode.SUBTRACT)
    with BuildSketch(Plane(origin=(-22.581983871, 8, -2.42509969), x_dir=(0.4103646773287979, 0, 0.9119215051751064), z_dir=(0.9119215051751064, 0, -0.4103646773287979))) as fillet1_piece_22a_section:
        with BuildLine():
            CenterArc((FILLET1_R, FILLET1_R), FILLET1_R, 180, 90)
            Line((0, FILLET1_R), (0, 0))
            Line((0, 0), (FILLET1_R, 0))
        make_face()
    fillet1_piece_22a = extrude(amount=31.931712199, mode=Mode.PRIVATE)
    fillet1_piece_22a = split(fillet1_piece_22a, bisect_by=Plane(origin=(-19.559662553, 7.587844387, -4.476923077), z_dir=(0, 0, 1)), keep=Keep.TOP, mode=Mode.PRIVATE)
    with BuildSketch(Plane(origin=(-43.030769231, 8, -4.476923077), x_dir=(0, 0, 1), z_dir=(1, 0, 0))) as fillet1_piece_22b_section:
        with BuildLine():
            CenterArc((FILLET1_R, FILLET1_R), FILLET1_R, 180, 90)
            Line((0, FILLET1_R), (0, 0))
            Line((0, 0), (FILLET1_R, 0))
        make_face()
    fillet1_piece_22b = extrude(amount=30.008392886, mode=Mode.PRIVATE)
    fillet1_piece_22b = split(fillet1_piece_22b, bisect_by=Plane(origin=(-16.620491992, 7.587844387, -5.107771036), z_dir=(0.4103646773287979, 0, 0.9119215051751064)), keep=Keep.TOP, mode=Mode.PRIVATE)
    fillet1_piece_22 = fillet1_piece_22a & fillet1_piece_22b
    add(fillet1_piece_22, mode=Mode.SUBTRACT)
    with BuildSketch(Plane(origin=(6.537231181, 8, 16.57490031), x_dir=(0, -1, 0), z_dir=(-0.9119215051751064, 0, -0.41036467732879806))) as fillet1_piece_23a_section:
        with BuildLine():
            CenterArc((FILLET1_R, -FILLET1_R), FILLET1_R, 90, 90)
            Line((0, -FILLET1_R), (0, 0))
            Line((0, 0), (FILLET1_R, 0))
        make_face()
    fillet1_piece_23a = extrude(amount=31.931712199, mode=Mode.PRIVATE)
    fillet1_piece_23a = split(fillet1_piece_23a, bisect_by=Plane(origin=(-19.559662553, 7.587844387, 5.523076923), z_dir=(0, 0, -1)), keep=Keep.TOP, mode=Mode.PRIVATE)
    with BuildSketch(Plane(origin=(-13.022376345, 8, 5.523076923), x_dir=(0, 0, -1), z_dir=(-1, 0, 0))) as fillet1_piece_23b_section:
        with BuildLine():
            CenterArc((FILLET1_R, FILLET1_R), FILLET1_R, 180, 90)
            Line((0, FILLET1_R), (0, 0))
            Line((0, 0), (FILLET1_R, 0))
        make_face()
    fillet1_piece_23b = extrude(amount=30.008392886, mode=Mode.PRIVATE)
    fillet1_piece_23b = split(fillet1_piece_23b, bisect_by=Plane(origin=(-16.620491992, 7.587844387, 6.153924882), z_dir=(0.41036467732879806, 0, -0.9119215051751064)), keep=Keep.TOP, mode=Mode.PRIVATE)
    fillet1_piece_23 = fillet1_piece_23a & fillet1_piece_23b
    add(fillet1_piece_23, mode=Mode.SUBTRACT)
    with BuildSketch(Plane(origin=(-43.030769231, 0, 5.523076923), x_dir=(0, 0, -1), z_dir=(1, 0, 0))) as fillet1_piece_24a_section:
        with BuildLine():
            CenterArc((FILLET1_R, FILLET1_R), FILLET1_R, 180, 90)
            Line((0, FILLET1_R), (0, 0))
            Line((0, 0), (FILLET1_R, 0))
        make_face()
    fillet1_piece_24a = extrude(amount=30.008392886, mode=Mode.PRIVATE)
    fillet1_piece_24a = split(fillet1_piece_24a, bisect_by=Plane(origin=(-16.620491992, 0.412155613, 6.153924882), z_dir=(0.41036467732879806, 0, -0.9119215051751064)), keep=Keep.TOP, mode=Mode.PRIVATE)
    with BuildSketch(Plane(origin=(-22.581983871, 0, 3.471253536), x_dir=(0.41036467732879806, 0, -0.9119215051751064), z_dir=(0.9119215051751064, 0, 0.41036467732879806))) as fillet1_piece_24b_section:
        with BuildLine():
            CenterArc((FILLET1_R, FILLET1_R), FILLET1_R, 180, 90)
            Line((0, FILLET1_R), (0, 0))
            Line((0, 0), (FILLET1_R, 0))
        make_face()
    fillet1_piece_24b = extrude(amount=31.931712199, mode=Mode.PRIVATE)
    fillet1_piece_24b = split(fillet1_piece_24b, bisect_by=Plane(origin=(-19.559662553, 0.412155613, 5.523076923), z_dir=(0, 0, -1)), keep=Keep.TOP, mode=Mode.PRIVATE)
    fillet1_piece_24 = fillet1_piece_24a & fillet1_piece_24b
    add(fillet1_piece_24, mode=Mode.SUBTRACT)

    # Sketch8 → Cut-Extrude5 (cut, through all)
    with BuildSketch(Plane(origin=(0, 0, -4.476923077), x_dir=(-1, 0, 0), z_dir=(0, 0, -1))):
        with Locations(Location((33.909652253, 4, 0), (0, 0, 68.471095594))):
            Circle(SKETCH8_R)
    extrude(amount=-CUT_EXTRUDE5_DEPTH, mode=Mode.SUBTRACT)

    # Sketch9 → Cut-Extrude6 (cut)
    with BuildSketch(Plane(origin=(0, 8, 0), x_dir=(1, 0, 0), z_dir=(0, 1, 0))):
        Polygon((-12.075489078, -0.523076923), (5.969230769, -6.523076923), (5.969230769, 5.476923077), align=None)
    extrude(amount=-CUT_EXTRUDE6_DEPTH, mode=Mode.SUBTRACT)

    # Fillet2
    fillet2_edges = [part.edges().sort_by_distance(p)[0] for p in [
        (-3.053129155, 0, 3.523076923),
        (5.969230769, 0, 0.523076923),
        (-3.053129155, 0, -2.476923077),
        (-12.075489078, 4, 0.523076923),
        (5.969230769, 4, -5.476923077),
        (5.969230769, 4, 6.523076923),
        (-3.053129155, 8, -2.476923077),
        (-3.053129155, 8, 3.523076923),
        (5.969230769, 8, 0.523076923),
    ]]
    fillet(fillet2_edges, radius=FILLET2_R)


solid = part.part
